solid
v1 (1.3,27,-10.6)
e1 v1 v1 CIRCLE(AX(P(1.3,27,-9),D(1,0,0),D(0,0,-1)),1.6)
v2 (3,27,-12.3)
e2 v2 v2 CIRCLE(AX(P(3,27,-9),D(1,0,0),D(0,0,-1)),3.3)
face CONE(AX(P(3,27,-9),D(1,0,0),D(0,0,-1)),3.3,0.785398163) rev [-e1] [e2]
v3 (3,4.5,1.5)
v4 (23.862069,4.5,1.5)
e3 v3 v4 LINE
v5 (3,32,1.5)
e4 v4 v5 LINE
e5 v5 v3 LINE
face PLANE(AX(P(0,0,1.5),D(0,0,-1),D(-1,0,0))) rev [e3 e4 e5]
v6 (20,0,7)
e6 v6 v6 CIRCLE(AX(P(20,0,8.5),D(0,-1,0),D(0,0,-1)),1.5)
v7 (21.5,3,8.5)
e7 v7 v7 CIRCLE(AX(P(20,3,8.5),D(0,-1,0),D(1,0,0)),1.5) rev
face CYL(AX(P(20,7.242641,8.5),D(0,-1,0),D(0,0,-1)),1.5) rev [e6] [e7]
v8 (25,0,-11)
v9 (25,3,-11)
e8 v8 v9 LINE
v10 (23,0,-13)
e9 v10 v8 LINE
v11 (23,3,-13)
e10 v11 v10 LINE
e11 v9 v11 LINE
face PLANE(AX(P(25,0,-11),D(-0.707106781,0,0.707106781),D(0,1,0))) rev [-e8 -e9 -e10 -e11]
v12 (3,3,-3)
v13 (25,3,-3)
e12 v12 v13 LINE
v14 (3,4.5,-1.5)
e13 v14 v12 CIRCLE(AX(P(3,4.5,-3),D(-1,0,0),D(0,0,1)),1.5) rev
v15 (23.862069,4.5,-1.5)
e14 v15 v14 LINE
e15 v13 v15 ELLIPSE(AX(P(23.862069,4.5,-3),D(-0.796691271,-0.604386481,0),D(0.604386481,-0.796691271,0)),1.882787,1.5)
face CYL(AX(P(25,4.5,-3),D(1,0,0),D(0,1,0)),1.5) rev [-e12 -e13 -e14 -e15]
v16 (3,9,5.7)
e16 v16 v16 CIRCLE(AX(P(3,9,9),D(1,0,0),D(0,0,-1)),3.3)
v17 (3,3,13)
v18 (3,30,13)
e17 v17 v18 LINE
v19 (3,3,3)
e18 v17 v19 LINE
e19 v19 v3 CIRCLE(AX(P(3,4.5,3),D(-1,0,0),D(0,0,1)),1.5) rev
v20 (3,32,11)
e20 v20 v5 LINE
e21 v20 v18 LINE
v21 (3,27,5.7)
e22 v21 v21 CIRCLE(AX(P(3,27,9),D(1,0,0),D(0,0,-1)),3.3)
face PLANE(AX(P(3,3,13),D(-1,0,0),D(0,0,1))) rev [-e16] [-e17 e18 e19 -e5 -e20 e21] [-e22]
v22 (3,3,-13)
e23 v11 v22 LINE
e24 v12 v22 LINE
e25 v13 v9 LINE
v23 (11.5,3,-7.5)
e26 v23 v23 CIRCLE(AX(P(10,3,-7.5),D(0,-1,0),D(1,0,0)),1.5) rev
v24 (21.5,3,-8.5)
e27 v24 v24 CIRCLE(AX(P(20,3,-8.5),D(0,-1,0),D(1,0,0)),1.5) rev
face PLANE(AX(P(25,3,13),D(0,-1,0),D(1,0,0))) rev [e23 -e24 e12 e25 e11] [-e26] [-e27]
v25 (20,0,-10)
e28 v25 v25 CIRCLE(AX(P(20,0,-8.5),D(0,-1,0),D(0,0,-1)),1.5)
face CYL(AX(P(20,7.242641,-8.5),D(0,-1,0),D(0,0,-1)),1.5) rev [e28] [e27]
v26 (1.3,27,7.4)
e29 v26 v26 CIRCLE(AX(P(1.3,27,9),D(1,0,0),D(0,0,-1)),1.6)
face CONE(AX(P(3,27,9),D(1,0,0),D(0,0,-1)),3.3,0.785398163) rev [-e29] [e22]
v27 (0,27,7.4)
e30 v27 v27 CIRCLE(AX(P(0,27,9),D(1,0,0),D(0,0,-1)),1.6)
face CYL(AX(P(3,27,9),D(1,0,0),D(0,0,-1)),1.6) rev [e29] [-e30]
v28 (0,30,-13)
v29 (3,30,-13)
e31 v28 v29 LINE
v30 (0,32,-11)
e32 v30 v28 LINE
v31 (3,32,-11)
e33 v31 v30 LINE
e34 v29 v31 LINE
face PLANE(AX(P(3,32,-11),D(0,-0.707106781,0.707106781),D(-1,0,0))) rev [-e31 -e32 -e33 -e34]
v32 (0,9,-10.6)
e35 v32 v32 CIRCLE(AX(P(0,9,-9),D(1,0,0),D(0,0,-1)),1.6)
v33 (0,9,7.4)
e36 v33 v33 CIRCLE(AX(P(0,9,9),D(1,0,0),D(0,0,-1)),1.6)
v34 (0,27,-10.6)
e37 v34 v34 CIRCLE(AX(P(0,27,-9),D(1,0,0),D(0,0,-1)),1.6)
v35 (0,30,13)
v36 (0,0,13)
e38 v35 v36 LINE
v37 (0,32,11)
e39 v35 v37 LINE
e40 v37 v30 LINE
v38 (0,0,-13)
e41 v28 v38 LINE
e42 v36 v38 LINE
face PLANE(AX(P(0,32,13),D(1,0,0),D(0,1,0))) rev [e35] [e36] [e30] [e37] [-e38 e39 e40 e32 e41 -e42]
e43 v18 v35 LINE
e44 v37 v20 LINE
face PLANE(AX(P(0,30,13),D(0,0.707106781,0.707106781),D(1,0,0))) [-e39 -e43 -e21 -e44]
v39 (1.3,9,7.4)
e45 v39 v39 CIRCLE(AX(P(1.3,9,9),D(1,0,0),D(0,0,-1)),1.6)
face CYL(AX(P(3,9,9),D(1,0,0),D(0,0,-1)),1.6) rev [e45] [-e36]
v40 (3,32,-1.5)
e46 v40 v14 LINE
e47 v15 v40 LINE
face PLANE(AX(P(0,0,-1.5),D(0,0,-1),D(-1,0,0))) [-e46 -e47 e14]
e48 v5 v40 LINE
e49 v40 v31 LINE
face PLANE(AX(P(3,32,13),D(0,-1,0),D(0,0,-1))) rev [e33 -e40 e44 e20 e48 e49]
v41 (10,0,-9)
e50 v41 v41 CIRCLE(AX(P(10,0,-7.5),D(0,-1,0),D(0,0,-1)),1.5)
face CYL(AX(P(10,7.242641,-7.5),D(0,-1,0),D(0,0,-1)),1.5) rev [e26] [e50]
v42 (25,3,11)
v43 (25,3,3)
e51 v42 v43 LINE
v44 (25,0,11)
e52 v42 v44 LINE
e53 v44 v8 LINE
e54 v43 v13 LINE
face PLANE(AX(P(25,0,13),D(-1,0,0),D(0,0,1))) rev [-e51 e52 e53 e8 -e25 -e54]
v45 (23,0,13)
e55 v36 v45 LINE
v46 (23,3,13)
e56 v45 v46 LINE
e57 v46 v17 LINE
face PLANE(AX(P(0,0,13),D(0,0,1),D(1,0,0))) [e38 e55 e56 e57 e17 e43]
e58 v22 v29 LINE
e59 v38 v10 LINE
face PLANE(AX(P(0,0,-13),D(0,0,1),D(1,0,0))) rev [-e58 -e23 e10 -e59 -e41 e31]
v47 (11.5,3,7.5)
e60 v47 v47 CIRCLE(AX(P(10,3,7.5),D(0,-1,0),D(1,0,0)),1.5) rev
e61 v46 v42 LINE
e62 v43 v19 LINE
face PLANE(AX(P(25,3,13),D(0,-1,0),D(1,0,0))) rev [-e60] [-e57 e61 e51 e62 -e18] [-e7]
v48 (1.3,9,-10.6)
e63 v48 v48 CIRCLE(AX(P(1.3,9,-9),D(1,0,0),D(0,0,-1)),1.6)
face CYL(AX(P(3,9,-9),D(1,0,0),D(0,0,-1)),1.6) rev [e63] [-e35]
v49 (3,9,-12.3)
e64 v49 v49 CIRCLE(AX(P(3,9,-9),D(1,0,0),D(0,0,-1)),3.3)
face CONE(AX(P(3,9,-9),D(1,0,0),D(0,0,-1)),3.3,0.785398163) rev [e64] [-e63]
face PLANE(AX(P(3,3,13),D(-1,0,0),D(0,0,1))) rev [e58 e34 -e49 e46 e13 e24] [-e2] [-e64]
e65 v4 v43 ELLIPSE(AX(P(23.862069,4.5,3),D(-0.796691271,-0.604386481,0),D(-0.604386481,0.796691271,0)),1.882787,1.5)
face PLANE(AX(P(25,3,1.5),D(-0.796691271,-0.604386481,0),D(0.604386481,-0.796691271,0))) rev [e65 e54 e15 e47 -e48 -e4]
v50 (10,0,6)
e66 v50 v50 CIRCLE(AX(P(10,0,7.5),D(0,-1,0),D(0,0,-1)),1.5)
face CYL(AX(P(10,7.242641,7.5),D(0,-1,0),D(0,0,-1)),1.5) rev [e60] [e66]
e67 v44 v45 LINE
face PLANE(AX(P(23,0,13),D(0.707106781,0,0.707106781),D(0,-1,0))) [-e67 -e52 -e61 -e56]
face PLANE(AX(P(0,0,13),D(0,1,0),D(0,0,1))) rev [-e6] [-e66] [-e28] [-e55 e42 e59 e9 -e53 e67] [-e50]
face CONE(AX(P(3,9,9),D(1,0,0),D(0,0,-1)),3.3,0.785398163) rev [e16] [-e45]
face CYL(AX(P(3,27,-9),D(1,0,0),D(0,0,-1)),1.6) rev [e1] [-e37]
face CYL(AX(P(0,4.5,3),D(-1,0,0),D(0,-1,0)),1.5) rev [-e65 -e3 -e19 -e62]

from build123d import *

# Parameters (mm, degrees)
EXTRUDE_1_DEPTH          = 13
SKETCH_4_R               = 1.5
CUT_EXTRUDE_1_DEPTH      = 3
EXTRUDE_2_DEPTH          = 1.5
CHAMFER_1_SIZE           = 2
FILLET_1_R               = 1.5
HOLE_WIZARD_1_AT_2_COUNT = 2
HOLE_WIZARD_1_AT_2_PITCH = 18
HOLE_WIZARD_1_AT_3_COUNT = 2
HOLE_WIZARD_1_AT_3_PITCH = 25.455844123
HOLE_WIZARD_1_AT_4_COUNT = 2
HOLE_WIZARD_1_AT_4_PITCH = 18


with BuildPart() as part:
    # 草图1 → 凸台-拉伸1 (new, symmetric)
    with BuildSketch(Plane.XY):
        Polygon((0, 0), (25, 0), (25, 3), (3, 3), (3, 32), (0, 32), align=None)
    extrude(amount=EXTRUDE_1_DEPTH, both=True)

    # 草图4 → 切除-拉伸1 (cut)
    with BuildSketch(Plane.XZ):
        with Locations(Location((10, -7.5, 0), (0, 0, 270))):
            Circle(SKETCH_4_R)
        with Locations(Location((10, 7.5, 0), (0, 0, 270))):
            Circle(SKETCH_4_R)
        with Locations(Location((20, 8.5, 0), (0, 0, 270))):
            Circle(SKETCH_4_R)
        with Locations(Location((20, -8.5, 0), (0, 0, 270))):
            Circle(SKETCH_4_R)
    extrude(amount=-CUT_EXTRUDE_1_DEPTH, mode=Mode.SUBTRACT)

    # 草图2 → 凸台-拉伸2 (add, symmetric)
    with BuildSketch(Plane.XY):
        Polygon((3, 32), (3, 3), (25, 3), align=None)
    extrude(amount=EXTRUDE_2_DEPTH, both=True)

    # 倒角1
    chamfer_1_edges = [part.edges().sort_by_distance(p)[0] for p in [
        (25, 1.5, 13),
        (1.5, 32, 13),
        (1.5, 32, -13),
        (25, 1.5, -13),
    ]]
    chamfer(chamfer_1_edges, length=CHAMFER_1_SIZE)

    # 圆角1
    # the kernel refuses this fillet: 1.5 mm, written as the material it adds along each edge
    with BuildSketch(Plane(origin=(3, 3, -1.5), x_dir=(0, 0, -1), z_dir=(1, 0, 0))) as fillet_1_piece_1_section:
        with BuildLine():
            CenterArc((FILLET_1_R, FILLET_1_R), FILLET_1_R, 180, 90)
            Line((0, FILLET_1_R), (0, 0))
            Line((0, 0), (FILLET_1_R, 0))
        make_face()
    fillet_1_piece_1 = extrude(amount=25.75, mode=Mode.PRIVATE)
    fillet_1_piece_1 = split(fillet_1_piece_1, bisect_by=Plane(origin=(20.775844012, 8.568205621, -1.836675405), z_dir=(-0.7966912709023963, -0.6043864813742318, 0)), keep=Keep.TOP, mode=Mode.PRIVATE)
    add(fillet_1_piece_1)
    with BuildSketch(Plane(origin=(3, 3, 1.5), x_dir=(0, 0, 1), z_dir=(1, 0, 0))) as fillet_1_piece_2_section:
        with BuildLine():
            CenterArc((FILLET_1_R, -FILLET_1_R), FILLET_1_R, 90, 90)
            Line((0, -FILLET_1_R), (0, 0))
            Line((0, 0), (FILLET_1_R, 0))
        make_face()
    fillet_1_piece_2 = extrude(amount=25.75, mode=Mode.PRIVATE)
    fillet_1_piece_2 = split(fillet_1_piece_2, bisect_by=Plane(origin=(20.775844012, 8.568205621, 1.836675405), z_dir=(-0.7966912709023963, -0.6043864813742318, 0)), keep=Keep.TOP, mode=Mode.PRIVATE)
    add(fillet_1_piece_2)

    # 草图6 → 打孔尺寸(%根据)开槽半沉头木螺钉的类型1 (revolve, cut)
    with BuildSketch(Plane(origin=(3, 9, -9), x_dir=(0, 0, -1), z_dir=(0, 1, 0))):
        Polygon((0, 0), (0, 3), (1.6, 3), (1.6, 1.7), (3.3, 0), align=None)
    hole_wizard_1 = revolve(axis=Axis((9.35, 9, -9), (-1, 0, 0)), mode=Mode.SUBTRACT)

    # 打孔尺寸(%根据)开槽半沉头木螺钉的类型1 at 2: 打孔尺寸(%根据)开槽半沉头木螺钉的类型1 ×2
    with Locations(*[(0, 0, i * HOLE_WIZARD_1_AT_2_PITCH) for i in range(1, HOLE_WIZARD_1_AT_2_COUNT)]):
        add(hole_wizard_1, mode=Mode.SUBTRACT)

    # 打孔尺寸(%根据)开槽半沉头木螺钉的类型1 at 3: 打孔尺寸(%根据)开槽半沉头木螺钉的类型1 ×2
    with Locations(*[Vector(0, 0.7071067811865476, 0.7071067811865476) * (i * HOLE_WIZARD_1_AT_3_PITCH) for i in range(1, HOLE_WIZARD_1_AT_3_COUNT)]):
        add(hole_wizard_1, mode=Mode.SUBTRACT)

    # 打孔尺寸(%根据)开槽半沉头木螺钉的类型1 at 4: 打孔尺寸(%根据)开槽半沉头木螺钉的类型1 ×2
    with Locations(*[(0, i * HOLE_WIZARD_1_AT_4_PITCH, 0) for i in range(1, HOLE_WIZARD_1_AT_4_COUNT)]):
        add(hole_wizard_1, mode=Mode.SUBTRACT)


solid = part.part
